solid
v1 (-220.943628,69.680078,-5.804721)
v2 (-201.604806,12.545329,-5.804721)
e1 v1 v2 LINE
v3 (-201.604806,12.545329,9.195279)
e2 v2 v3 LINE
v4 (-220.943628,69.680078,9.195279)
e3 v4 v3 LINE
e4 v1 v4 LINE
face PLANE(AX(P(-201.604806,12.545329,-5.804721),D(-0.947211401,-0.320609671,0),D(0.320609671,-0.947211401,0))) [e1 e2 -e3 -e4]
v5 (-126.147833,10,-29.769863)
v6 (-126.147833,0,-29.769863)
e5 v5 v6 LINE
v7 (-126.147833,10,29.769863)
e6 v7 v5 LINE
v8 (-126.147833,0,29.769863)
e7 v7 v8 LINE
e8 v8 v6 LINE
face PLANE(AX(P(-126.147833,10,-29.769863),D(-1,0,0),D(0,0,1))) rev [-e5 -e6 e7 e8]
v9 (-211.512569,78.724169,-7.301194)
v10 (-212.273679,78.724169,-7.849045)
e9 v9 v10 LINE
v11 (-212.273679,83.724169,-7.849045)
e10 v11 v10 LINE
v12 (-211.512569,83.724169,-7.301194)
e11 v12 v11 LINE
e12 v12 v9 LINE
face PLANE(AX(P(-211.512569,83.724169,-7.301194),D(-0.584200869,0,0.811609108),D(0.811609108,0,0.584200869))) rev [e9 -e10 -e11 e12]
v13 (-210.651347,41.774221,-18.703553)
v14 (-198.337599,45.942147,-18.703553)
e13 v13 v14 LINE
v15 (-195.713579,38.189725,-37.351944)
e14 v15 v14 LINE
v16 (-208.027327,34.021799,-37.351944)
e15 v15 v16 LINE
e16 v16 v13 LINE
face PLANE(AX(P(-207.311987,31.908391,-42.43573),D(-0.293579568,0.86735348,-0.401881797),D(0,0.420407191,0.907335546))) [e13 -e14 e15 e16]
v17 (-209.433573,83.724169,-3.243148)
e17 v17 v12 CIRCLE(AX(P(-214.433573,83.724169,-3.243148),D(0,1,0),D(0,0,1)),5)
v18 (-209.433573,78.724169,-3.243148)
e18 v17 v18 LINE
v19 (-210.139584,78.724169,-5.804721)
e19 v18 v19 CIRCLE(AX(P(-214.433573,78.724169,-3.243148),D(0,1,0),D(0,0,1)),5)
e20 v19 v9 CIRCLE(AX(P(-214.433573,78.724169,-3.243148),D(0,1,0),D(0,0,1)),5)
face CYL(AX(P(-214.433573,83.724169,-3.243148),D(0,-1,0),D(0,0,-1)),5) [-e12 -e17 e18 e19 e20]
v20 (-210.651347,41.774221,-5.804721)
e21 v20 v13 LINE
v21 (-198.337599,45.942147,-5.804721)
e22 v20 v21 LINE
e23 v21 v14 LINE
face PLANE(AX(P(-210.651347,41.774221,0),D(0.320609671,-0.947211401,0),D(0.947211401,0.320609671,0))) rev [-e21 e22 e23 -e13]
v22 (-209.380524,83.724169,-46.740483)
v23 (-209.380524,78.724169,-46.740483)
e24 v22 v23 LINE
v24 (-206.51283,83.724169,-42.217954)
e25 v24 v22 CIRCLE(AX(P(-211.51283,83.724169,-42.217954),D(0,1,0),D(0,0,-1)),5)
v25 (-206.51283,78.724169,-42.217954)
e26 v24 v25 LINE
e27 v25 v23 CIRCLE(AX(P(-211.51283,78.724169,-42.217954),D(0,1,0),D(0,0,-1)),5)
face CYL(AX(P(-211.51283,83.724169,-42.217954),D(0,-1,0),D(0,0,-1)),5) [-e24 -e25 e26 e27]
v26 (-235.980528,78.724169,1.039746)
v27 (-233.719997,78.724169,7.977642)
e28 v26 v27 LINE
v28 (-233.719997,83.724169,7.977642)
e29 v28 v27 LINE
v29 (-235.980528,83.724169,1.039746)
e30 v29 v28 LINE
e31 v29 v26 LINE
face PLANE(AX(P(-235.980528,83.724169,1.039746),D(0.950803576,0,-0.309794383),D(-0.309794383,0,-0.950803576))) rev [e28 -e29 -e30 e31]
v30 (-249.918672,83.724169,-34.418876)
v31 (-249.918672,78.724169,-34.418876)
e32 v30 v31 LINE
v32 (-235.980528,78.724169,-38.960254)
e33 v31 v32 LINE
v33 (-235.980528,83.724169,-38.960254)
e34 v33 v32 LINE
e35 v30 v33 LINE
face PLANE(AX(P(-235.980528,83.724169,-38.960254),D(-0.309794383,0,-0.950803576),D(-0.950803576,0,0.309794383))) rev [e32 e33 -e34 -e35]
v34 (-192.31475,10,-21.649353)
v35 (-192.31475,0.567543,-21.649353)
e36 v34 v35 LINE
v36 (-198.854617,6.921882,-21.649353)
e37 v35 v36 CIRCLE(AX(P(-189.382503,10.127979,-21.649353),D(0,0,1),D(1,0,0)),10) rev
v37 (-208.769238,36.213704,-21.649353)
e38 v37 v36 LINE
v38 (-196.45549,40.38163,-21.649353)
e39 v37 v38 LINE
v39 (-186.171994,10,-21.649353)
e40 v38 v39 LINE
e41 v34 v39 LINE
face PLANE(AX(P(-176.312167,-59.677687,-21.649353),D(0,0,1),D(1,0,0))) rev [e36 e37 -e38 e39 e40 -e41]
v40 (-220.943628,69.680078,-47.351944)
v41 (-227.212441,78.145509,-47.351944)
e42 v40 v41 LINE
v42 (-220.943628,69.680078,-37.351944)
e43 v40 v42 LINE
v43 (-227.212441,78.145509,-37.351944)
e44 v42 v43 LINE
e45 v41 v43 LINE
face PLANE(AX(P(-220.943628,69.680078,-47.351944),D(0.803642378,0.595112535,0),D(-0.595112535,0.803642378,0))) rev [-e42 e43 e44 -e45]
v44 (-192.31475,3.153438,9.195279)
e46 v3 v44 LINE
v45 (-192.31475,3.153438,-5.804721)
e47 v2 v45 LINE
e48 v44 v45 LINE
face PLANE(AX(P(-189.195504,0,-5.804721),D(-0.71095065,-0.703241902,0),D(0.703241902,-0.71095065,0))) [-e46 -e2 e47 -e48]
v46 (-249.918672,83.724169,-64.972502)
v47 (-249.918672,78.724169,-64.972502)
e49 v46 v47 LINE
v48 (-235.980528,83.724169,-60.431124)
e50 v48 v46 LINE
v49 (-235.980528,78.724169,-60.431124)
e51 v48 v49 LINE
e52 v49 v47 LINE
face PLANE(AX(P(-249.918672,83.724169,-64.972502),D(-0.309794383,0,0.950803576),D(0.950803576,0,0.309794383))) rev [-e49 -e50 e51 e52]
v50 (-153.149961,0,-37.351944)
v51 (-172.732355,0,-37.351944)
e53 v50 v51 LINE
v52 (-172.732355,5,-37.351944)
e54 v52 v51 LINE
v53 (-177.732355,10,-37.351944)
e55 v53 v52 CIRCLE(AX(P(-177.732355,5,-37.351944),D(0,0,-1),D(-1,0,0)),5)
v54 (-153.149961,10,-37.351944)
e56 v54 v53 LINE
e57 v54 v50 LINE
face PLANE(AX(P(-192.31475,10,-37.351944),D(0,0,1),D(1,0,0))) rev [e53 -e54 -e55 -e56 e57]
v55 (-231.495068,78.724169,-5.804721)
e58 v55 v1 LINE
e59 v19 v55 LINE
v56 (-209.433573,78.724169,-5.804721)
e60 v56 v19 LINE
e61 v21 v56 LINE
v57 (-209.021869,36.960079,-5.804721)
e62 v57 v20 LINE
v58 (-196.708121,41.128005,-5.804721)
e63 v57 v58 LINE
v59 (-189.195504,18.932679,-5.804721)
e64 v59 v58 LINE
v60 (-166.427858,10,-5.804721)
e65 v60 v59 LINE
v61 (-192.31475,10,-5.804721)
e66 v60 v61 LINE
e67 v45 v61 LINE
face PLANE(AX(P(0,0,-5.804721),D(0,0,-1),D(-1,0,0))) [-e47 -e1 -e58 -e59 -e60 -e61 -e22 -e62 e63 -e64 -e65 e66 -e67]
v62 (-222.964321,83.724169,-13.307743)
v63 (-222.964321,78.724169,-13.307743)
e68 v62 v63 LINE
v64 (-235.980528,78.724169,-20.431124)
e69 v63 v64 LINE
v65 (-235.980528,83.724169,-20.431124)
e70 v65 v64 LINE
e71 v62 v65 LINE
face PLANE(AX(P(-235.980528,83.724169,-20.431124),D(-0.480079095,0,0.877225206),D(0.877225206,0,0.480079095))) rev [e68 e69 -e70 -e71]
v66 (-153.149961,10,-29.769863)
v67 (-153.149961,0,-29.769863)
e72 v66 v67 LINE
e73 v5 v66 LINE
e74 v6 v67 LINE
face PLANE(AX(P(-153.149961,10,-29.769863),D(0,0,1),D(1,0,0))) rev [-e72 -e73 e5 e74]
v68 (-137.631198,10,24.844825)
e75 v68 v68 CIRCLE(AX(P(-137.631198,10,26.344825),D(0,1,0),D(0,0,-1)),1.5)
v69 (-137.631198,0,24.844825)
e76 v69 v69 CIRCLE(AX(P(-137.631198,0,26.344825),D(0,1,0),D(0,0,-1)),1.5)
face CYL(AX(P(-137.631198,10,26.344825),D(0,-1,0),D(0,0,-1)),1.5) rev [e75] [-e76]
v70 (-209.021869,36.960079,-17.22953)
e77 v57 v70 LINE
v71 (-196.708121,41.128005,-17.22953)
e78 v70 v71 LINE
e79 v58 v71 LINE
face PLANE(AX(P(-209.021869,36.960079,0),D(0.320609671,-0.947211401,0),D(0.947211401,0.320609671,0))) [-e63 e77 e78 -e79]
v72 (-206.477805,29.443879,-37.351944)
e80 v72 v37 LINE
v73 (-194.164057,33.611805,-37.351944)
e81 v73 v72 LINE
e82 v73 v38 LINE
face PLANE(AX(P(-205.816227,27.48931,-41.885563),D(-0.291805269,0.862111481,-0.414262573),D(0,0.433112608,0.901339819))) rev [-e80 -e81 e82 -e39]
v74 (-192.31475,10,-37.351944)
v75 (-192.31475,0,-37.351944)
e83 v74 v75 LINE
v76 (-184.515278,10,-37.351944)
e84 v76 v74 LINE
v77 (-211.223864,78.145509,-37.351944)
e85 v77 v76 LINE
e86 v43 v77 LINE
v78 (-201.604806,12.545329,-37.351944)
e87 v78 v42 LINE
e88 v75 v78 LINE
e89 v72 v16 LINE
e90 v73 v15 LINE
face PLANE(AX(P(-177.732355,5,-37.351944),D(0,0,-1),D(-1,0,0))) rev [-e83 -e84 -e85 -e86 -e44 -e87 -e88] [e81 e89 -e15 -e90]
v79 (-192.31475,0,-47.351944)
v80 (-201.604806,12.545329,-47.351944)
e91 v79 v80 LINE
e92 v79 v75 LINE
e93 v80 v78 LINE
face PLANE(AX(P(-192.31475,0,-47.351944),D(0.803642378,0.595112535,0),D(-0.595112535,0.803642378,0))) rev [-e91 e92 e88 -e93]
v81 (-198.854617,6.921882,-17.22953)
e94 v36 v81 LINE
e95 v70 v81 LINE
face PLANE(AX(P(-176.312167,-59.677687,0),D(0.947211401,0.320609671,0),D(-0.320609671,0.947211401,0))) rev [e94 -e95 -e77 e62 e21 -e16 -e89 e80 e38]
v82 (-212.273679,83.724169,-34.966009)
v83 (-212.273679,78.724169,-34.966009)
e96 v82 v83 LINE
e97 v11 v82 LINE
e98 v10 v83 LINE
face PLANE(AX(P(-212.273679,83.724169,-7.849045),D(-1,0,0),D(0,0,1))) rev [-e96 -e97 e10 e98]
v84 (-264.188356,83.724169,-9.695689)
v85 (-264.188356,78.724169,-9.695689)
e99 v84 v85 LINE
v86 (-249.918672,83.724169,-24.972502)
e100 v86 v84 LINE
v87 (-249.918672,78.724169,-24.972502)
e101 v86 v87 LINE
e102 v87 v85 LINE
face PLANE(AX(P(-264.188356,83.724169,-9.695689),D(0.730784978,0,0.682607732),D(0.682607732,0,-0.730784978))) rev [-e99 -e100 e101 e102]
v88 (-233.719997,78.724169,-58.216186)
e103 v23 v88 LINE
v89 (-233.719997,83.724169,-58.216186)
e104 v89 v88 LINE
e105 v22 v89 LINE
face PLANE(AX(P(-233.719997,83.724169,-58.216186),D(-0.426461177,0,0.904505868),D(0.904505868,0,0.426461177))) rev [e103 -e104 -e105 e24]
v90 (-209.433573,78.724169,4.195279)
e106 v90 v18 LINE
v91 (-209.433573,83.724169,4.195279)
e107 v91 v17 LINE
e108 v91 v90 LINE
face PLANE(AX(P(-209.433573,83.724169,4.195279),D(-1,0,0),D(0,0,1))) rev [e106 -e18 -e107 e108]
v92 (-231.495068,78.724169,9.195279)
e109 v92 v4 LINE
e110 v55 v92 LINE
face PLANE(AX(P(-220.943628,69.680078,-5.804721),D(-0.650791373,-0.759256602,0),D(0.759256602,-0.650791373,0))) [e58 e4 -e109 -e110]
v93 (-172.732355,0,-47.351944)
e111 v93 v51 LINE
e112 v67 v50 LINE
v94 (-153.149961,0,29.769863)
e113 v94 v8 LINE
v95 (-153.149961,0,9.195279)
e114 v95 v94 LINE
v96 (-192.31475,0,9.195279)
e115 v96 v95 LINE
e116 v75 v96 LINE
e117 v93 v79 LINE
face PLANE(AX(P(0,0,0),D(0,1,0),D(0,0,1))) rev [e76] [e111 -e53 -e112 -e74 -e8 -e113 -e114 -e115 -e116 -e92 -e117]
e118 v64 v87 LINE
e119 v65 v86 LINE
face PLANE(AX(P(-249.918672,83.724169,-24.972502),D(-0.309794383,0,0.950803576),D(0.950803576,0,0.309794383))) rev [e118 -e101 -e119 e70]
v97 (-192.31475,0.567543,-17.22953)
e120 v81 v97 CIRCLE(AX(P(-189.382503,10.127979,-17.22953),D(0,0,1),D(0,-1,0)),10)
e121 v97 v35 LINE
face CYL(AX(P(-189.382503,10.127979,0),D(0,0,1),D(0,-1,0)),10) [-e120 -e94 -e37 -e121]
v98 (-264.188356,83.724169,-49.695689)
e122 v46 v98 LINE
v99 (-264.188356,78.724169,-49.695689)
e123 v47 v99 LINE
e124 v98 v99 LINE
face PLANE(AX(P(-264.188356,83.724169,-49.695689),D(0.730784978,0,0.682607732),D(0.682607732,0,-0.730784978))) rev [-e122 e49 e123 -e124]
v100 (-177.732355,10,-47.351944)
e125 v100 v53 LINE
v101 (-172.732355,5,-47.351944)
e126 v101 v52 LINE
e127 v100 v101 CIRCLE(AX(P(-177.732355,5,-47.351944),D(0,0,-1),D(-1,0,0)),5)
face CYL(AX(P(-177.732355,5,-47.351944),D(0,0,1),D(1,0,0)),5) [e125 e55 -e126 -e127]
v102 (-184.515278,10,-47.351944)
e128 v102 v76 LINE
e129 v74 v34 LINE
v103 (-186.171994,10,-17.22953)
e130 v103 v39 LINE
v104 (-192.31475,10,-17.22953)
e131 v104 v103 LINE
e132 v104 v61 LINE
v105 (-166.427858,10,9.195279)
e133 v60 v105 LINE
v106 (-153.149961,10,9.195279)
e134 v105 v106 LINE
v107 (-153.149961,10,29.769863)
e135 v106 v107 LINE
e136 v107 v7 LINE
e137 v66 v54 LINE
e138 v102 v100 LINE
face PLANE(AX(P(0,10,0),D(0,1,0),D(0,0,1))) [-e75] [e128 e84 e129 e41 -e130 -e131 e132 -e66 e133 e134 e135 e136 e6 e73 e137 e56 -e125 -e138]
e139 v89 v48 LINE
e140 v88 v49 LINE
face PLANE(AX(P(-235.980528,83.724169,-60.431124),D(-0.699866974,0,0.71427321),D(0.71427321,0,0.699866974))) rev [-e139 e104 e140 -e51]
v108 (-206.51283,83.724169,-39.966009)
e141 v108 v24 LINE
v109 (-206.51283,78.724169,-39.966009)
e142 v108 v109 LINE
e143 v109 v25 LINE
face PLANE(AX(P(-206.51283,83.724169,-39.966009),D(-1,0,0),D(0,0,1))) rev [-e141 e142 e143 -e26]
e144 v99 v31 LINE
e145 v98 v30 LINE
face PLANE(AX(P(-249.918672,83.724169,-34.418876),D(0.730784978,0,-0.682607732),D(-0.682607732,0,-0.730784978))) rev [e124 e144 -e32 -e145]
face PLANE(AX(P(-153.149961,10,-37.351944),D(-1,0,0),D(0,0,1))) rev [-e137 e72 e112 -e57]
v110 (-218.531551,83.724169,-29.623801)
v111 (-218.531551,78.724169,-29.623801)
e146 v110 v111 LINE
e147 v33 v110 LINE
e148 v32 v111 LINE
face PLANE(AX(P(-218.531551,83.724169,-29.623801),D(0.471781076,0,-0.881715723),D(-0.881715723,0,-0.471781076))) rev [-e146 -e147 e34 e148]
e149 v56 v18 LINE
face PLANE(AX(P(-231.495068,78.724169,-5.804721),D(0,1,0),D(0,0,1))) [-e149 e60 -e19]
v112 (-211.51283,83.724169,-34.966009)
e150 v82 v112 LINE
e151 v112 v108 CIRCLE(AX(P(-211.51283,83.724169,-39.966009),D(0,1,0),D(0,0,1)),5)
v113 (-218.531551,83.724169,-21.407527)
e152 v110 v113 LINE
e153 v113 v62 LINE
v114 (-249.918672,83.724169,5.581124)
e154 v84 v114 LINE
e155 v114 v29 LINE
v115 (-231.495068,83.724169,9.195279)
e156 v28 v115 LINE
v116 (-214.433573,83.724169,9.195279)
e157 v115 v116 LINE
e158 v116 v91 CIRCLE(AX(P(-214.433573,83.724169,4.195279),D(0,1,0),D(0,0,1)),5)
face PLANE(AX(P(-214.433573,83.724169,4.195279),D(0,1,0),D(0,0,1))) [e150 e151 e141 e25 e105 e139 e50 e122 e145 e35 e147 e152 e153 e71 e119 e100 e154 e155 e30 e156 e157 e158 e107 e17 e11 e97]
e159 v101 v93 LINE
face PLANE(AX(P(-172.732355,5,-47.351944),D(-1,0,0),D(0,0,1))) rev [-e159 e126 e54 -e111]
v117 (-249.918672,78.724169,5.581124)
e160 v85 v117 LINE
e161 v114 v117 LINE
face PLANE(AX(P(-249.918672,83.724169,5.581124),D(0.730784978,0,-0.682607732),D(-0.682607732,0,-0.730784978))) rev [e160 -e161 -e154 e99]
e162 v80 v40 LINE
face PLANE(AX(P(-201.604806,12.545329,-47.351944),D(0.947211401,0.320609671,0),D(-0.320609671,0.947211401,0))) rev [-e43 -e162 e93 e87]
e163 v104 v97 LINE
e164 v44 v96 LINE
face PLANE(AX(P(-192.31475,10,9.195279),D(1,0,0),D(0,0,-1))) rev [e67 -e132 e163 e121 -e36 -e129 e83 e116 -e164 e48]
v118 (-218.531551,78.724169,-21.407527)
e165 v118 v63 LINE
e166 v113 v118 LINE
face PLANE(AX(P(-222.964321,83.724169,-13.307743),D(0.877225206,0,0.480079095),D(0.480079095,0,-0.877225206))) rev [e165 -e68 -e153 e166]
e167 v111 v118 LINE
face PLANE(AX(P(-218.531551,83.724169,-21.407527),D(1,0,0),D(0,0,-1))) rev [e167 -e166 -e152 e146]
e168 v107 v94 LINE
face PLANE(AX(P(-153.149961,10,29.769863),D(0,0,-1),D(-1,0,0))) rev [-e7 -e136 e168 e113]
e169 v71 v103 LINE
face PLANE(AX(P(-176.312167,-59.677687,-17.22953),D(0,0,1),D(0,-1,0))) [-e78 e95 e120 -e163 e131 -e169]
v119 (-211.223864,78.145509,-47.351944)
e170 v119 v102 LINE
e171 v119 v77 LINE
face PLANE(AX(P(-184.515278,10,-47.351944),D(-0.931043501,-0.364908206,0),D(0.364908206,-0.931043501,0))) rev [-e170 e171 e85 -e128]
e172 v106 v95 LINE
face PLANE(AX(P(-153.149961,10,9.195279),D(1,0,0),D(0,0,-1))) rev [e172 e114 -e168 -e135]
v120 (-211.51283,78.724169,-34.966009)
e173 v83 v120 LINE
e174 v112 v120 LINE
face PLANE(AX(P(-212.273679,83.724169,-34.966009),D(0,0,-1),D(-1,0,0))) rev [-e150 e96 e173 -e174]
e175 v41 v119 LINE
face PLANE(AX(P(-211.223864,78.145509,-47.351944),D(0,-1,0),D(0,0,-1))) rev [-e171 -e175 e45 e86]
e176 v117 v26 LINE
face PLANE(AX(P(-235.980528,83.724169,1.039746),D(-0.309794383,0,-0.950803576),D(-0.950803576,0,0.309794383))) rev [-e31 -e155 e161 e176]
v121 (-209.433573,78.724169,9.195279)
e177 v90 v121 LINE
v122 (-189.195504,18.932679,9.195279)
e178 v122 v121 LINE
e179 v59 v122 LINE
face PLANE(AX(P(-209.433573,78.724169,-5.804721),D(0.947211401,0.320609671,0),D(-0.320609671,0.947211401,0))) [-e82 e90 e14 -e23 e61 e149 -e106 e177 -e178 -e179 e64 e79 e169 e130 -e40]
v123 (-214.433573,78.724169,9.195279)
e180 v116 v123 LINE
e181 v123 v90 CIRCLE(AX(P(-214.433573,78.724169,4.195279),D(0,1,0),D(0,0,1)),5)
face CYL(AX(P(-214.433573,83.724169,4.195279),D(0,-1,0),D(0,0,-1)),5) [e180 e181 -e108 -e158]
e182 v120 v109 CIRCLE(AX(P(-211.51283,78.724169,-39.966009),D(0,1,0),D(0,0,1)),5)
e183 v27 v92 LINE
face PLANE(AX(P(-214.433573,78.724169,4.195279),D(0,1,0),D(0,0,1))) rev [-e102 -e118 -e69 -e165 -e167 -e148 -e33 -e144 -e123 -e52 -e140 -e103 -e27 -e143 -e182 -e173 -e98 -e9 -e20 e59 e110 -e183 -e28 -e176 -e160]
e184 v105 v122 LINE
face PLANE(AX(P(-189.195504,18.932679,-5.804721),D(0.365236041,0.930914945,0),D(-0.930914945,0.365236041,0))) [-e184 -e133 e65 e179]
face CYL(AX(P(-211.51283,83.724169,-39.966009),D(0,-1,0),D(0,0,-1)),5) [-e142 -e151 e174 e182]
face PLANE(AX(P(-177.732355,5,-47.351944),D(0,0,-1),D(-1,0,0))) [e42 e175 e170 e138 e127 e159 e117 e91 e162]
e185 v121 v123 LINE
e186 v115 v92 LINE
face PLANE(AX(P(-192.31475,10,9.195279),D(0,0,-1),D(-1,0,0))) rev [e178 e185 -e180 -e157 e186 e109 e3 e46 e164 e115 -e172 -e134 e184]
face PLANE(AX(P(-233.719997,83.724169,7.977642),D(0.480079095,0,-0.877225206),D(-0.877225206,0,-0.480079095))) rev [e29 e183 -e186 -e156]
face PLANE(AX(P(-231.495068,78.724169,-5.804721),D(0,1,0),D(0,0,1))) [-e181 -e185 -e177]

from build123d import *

# Parameters (mm, degrees)
CROQUIS1_R              = 1.5
SALIENTE_EXTRUIR1_DEPTH = 10
SALIENTE_EXTRUIR2_DEPTH = 15
SALIENTE_EXTRUIR3_DEPTH = 13
SALIENTE_EXTRUIR7_DEPTH = 5
REDONDEO2_R             = 10
SALIENTE_EXTRUIR8_DEPTH = 10


with BuildPart() as part:
    # Croquis1 → Saliente-Extruir1 (new body)
    with BuildSketch(Plane(origin=(0, 0, 0), x_dir=(1, 0, 0), z_dir=(0, 1, 0))):
        Polygon((-192.31475004, 37.351943635), (-153.149960772, 37.351943635), (-153.149960772, 29.769862991), (-126.147833027, 29.769862991), (-126.147833027, -29.769862991), (-153.149960772, -29.769862991), (-153.149960772, -9.1952793), (-192.31475004, -9.1952793), align=None)
        with Locations(Location((-137.631197841, -26.344824576, 0), (0, 0, 90))):
            Circle(CROQUIS1_R, mode=Mode.SUBTRACT)
    extrude(amount=SALIENTE_EXTRUIR1_DEPTH)

    # Croquis3 → Saliente-Extruir2 (add)
    with BuildSketch(Plane.XY.offset(9.1952793)):
        Polygon((-189.195504205, 0), (-201.604805992, 12.545329197), (-220.943628409, 69.680078214), (-231.495067756, 78.724169083), (-209.43357333, 78.724169083), (-189.195504205, 18.932679451), (-166.427858451, 10), (-166.427858451, 0), align=None)
    extrude(amount=-SALIENTE_EXTRUIR2_DEPTH)

    # Croquis8 → Saliente-Extruir3 (add)
    with BuildSketch(Plane(origin=(-163.998418841, -55.509761627, 0), x_dir=(0, 0, -1), z_dir=(0.9472114013741786, 0.3206096709501519, 0))):
        Polygon((5.8047207, 107.105877542), (5.8047207, 102.023441322), (17.229529669, 102.023441322), (17.229529669, 62.195551935), (21.649352835, 62.195551935), (21.649352835, 101.235469829), (41.412588148, 92.240137187), (41.412588148, 97.139259402), (18.703552524, 107.105877542), align=None)
    extrude(amount=-SALIENTE_EXTRUIR3_DEPTH)

    # Croquis10 → Saliente-Extruir7 (add)
    with BuildSketch(Plane(origin=(0, 78.724169083, 0), x_dir=(1, 0, 0), z_dir=(0, 1, 0))):
        with BuildLine():
            Line((-249.918671642, 64.972502389), (-235.980528396, 60.431124344))
            Line((-235.980528396, 60.431124344), (-233.719997047, 58.216185839))
            Line((-233.719997047, 58.216185839), (-209.380524185, 46.740483345))
            ThreePointArc((-209.380524185, 46.740483345), (-207.290181053, 44.895496777), (-206.512830069, 42.217954006))
            Line((-206.512830069, 42.217954006), (-206.512830069, 39.966009421))
            ThreePointArc((-206.512830069, 39.966009421), (-207.977296163, 36.430475515), (-211.512830069, 34.966009421))
            Line((-211.512830069, 34.966009421), (-212.273678507, 34.966009421))
            Line((-212.273678507, 34.966009421), (-212.273678507, 7.849044618))
            Line((-212.273678507, 7.849044618), (-211.512568985, 7.30119364))
            ThreePointArc((-211.512568985, 7.30119364), (-209.983572109, 5.522948339), (-209.43357333, 3.243148098))
            Line((-209.43357333, 3.243148098), (-209.43357333, -4.1952793))
            ThreePointArc((-209.43357333, -4.1952793), (-210.898039424, -7.730813206), (-214.43357333, -9.1952793))
            Line((-214.43357333, -9.1952793), (-231.495067756, -9.1952793))
            Line((-231.495067756, -9.1952793), (-233.719997047, -7.977642104))
            Line((-233.719997047, -7.977642104), (-235.980528396, -1.039745845))
            Line((-235.980528396, -1.039745845), (-249.918671642, -5.581123891))
            Line((-249.918671642, -5.581123891), (-264.188355718, 9.695689249))
            Line((-264.188355718, 9.695689249), (-249.918671642, 24.972502389))
            Line((-249.918671642, 24.972502389), (-235.980528396, 20.431124344))
            Line((-235.980528396, 20.431124344), (-222.964320543, 13.307743434))
            Line((-222.964320543, 13.307743434), (-218.531551458, 21.40752702))
            Line((-218.531551458, 21.40752702), (-218.531551458, 29.623801484))
            Line((-218.531551458, 29.623801484), (-235.980528396, 38.960254155))
            Line((-235.980528396, 38.960254155), (-249.918671642, 34.418876109))
            Line((-249.918671642, 34.418876109), (-264.188355718, 49.695689249))
            Line((-264.188355718, 49.695689249), (-249.918671642, 64.972502389))
        make_face()
    extrude(amount=SALIENTE_EXTRUIR7_DEPTH)

    # Redondeo2
    # the kernel refuses this fillet: 10 mm, written as the material it takes off along each edge
    with BuildSketch(Plane(origin=(-196.252662499, -0.765351442, 3.059587863), x_dir=(0.947211401374178, 0.3206096709501537, 0), z_dir=(0, 0, -1))) as redondeo2_piece_1:
        with BuildLine():
            CenterArc((10, -8.115647013), REDONDEO2_R, 125.75091012, 54.24908988)
            Line((0, -8.115647013), (-0.2, -8.115647013))
            Line((-0.2, -8.115647013), (-0.2, 0))
            Line((-0.2, 0), (0, 0.2))
            ThreePointArc((0, 0.2), (2.078687215, 0.2), (4.040521918, 0.16231294))
            Line((4.040521918, 0.16231294), (4.157374429, 0))
        make_face()
    extrude(amount=44.99805823, mode=Mode.SUBTRACT)

    # Croquis13 → Saliente-Extruir8 (add)
    with BuildSketch(Plane(origin=(0, 0, -37.351943635), x_dir=(-1, 0, 0), z_dir=(0, 0, -1))):
        with BuildLine():
            Line((192.31475004, 0), (201.604805992, 12.545329197))
            Line((201.604805992, 12.545329197), (220.943628409, 69.680078214))
            Line((220.943628409, 69.680078214), (227.212441383, 78.145508653))
            Line((227.212441383, 78.145508653), (211.22386426, 78.145508653))
            Line((211.22386426, 78.145508653), (184.515278381, 10))
            Line((184.515278381, 10), (177.732355406, 10))
            ThreePointArc((177.732355406, 10), (174.1968215, 8.535533906), (172.732355406, 5))
            Line((172.732355406, 5), (172.732355406, 0))
            Line((172.732355406, 0), (182.732355406, 0))
            Line((182.732355406, 0), (192.31475004, 0))
        make_face()
    extrude(amount=SALIENTE_EXTRUIR8_DEPTH)


solid = part.part
